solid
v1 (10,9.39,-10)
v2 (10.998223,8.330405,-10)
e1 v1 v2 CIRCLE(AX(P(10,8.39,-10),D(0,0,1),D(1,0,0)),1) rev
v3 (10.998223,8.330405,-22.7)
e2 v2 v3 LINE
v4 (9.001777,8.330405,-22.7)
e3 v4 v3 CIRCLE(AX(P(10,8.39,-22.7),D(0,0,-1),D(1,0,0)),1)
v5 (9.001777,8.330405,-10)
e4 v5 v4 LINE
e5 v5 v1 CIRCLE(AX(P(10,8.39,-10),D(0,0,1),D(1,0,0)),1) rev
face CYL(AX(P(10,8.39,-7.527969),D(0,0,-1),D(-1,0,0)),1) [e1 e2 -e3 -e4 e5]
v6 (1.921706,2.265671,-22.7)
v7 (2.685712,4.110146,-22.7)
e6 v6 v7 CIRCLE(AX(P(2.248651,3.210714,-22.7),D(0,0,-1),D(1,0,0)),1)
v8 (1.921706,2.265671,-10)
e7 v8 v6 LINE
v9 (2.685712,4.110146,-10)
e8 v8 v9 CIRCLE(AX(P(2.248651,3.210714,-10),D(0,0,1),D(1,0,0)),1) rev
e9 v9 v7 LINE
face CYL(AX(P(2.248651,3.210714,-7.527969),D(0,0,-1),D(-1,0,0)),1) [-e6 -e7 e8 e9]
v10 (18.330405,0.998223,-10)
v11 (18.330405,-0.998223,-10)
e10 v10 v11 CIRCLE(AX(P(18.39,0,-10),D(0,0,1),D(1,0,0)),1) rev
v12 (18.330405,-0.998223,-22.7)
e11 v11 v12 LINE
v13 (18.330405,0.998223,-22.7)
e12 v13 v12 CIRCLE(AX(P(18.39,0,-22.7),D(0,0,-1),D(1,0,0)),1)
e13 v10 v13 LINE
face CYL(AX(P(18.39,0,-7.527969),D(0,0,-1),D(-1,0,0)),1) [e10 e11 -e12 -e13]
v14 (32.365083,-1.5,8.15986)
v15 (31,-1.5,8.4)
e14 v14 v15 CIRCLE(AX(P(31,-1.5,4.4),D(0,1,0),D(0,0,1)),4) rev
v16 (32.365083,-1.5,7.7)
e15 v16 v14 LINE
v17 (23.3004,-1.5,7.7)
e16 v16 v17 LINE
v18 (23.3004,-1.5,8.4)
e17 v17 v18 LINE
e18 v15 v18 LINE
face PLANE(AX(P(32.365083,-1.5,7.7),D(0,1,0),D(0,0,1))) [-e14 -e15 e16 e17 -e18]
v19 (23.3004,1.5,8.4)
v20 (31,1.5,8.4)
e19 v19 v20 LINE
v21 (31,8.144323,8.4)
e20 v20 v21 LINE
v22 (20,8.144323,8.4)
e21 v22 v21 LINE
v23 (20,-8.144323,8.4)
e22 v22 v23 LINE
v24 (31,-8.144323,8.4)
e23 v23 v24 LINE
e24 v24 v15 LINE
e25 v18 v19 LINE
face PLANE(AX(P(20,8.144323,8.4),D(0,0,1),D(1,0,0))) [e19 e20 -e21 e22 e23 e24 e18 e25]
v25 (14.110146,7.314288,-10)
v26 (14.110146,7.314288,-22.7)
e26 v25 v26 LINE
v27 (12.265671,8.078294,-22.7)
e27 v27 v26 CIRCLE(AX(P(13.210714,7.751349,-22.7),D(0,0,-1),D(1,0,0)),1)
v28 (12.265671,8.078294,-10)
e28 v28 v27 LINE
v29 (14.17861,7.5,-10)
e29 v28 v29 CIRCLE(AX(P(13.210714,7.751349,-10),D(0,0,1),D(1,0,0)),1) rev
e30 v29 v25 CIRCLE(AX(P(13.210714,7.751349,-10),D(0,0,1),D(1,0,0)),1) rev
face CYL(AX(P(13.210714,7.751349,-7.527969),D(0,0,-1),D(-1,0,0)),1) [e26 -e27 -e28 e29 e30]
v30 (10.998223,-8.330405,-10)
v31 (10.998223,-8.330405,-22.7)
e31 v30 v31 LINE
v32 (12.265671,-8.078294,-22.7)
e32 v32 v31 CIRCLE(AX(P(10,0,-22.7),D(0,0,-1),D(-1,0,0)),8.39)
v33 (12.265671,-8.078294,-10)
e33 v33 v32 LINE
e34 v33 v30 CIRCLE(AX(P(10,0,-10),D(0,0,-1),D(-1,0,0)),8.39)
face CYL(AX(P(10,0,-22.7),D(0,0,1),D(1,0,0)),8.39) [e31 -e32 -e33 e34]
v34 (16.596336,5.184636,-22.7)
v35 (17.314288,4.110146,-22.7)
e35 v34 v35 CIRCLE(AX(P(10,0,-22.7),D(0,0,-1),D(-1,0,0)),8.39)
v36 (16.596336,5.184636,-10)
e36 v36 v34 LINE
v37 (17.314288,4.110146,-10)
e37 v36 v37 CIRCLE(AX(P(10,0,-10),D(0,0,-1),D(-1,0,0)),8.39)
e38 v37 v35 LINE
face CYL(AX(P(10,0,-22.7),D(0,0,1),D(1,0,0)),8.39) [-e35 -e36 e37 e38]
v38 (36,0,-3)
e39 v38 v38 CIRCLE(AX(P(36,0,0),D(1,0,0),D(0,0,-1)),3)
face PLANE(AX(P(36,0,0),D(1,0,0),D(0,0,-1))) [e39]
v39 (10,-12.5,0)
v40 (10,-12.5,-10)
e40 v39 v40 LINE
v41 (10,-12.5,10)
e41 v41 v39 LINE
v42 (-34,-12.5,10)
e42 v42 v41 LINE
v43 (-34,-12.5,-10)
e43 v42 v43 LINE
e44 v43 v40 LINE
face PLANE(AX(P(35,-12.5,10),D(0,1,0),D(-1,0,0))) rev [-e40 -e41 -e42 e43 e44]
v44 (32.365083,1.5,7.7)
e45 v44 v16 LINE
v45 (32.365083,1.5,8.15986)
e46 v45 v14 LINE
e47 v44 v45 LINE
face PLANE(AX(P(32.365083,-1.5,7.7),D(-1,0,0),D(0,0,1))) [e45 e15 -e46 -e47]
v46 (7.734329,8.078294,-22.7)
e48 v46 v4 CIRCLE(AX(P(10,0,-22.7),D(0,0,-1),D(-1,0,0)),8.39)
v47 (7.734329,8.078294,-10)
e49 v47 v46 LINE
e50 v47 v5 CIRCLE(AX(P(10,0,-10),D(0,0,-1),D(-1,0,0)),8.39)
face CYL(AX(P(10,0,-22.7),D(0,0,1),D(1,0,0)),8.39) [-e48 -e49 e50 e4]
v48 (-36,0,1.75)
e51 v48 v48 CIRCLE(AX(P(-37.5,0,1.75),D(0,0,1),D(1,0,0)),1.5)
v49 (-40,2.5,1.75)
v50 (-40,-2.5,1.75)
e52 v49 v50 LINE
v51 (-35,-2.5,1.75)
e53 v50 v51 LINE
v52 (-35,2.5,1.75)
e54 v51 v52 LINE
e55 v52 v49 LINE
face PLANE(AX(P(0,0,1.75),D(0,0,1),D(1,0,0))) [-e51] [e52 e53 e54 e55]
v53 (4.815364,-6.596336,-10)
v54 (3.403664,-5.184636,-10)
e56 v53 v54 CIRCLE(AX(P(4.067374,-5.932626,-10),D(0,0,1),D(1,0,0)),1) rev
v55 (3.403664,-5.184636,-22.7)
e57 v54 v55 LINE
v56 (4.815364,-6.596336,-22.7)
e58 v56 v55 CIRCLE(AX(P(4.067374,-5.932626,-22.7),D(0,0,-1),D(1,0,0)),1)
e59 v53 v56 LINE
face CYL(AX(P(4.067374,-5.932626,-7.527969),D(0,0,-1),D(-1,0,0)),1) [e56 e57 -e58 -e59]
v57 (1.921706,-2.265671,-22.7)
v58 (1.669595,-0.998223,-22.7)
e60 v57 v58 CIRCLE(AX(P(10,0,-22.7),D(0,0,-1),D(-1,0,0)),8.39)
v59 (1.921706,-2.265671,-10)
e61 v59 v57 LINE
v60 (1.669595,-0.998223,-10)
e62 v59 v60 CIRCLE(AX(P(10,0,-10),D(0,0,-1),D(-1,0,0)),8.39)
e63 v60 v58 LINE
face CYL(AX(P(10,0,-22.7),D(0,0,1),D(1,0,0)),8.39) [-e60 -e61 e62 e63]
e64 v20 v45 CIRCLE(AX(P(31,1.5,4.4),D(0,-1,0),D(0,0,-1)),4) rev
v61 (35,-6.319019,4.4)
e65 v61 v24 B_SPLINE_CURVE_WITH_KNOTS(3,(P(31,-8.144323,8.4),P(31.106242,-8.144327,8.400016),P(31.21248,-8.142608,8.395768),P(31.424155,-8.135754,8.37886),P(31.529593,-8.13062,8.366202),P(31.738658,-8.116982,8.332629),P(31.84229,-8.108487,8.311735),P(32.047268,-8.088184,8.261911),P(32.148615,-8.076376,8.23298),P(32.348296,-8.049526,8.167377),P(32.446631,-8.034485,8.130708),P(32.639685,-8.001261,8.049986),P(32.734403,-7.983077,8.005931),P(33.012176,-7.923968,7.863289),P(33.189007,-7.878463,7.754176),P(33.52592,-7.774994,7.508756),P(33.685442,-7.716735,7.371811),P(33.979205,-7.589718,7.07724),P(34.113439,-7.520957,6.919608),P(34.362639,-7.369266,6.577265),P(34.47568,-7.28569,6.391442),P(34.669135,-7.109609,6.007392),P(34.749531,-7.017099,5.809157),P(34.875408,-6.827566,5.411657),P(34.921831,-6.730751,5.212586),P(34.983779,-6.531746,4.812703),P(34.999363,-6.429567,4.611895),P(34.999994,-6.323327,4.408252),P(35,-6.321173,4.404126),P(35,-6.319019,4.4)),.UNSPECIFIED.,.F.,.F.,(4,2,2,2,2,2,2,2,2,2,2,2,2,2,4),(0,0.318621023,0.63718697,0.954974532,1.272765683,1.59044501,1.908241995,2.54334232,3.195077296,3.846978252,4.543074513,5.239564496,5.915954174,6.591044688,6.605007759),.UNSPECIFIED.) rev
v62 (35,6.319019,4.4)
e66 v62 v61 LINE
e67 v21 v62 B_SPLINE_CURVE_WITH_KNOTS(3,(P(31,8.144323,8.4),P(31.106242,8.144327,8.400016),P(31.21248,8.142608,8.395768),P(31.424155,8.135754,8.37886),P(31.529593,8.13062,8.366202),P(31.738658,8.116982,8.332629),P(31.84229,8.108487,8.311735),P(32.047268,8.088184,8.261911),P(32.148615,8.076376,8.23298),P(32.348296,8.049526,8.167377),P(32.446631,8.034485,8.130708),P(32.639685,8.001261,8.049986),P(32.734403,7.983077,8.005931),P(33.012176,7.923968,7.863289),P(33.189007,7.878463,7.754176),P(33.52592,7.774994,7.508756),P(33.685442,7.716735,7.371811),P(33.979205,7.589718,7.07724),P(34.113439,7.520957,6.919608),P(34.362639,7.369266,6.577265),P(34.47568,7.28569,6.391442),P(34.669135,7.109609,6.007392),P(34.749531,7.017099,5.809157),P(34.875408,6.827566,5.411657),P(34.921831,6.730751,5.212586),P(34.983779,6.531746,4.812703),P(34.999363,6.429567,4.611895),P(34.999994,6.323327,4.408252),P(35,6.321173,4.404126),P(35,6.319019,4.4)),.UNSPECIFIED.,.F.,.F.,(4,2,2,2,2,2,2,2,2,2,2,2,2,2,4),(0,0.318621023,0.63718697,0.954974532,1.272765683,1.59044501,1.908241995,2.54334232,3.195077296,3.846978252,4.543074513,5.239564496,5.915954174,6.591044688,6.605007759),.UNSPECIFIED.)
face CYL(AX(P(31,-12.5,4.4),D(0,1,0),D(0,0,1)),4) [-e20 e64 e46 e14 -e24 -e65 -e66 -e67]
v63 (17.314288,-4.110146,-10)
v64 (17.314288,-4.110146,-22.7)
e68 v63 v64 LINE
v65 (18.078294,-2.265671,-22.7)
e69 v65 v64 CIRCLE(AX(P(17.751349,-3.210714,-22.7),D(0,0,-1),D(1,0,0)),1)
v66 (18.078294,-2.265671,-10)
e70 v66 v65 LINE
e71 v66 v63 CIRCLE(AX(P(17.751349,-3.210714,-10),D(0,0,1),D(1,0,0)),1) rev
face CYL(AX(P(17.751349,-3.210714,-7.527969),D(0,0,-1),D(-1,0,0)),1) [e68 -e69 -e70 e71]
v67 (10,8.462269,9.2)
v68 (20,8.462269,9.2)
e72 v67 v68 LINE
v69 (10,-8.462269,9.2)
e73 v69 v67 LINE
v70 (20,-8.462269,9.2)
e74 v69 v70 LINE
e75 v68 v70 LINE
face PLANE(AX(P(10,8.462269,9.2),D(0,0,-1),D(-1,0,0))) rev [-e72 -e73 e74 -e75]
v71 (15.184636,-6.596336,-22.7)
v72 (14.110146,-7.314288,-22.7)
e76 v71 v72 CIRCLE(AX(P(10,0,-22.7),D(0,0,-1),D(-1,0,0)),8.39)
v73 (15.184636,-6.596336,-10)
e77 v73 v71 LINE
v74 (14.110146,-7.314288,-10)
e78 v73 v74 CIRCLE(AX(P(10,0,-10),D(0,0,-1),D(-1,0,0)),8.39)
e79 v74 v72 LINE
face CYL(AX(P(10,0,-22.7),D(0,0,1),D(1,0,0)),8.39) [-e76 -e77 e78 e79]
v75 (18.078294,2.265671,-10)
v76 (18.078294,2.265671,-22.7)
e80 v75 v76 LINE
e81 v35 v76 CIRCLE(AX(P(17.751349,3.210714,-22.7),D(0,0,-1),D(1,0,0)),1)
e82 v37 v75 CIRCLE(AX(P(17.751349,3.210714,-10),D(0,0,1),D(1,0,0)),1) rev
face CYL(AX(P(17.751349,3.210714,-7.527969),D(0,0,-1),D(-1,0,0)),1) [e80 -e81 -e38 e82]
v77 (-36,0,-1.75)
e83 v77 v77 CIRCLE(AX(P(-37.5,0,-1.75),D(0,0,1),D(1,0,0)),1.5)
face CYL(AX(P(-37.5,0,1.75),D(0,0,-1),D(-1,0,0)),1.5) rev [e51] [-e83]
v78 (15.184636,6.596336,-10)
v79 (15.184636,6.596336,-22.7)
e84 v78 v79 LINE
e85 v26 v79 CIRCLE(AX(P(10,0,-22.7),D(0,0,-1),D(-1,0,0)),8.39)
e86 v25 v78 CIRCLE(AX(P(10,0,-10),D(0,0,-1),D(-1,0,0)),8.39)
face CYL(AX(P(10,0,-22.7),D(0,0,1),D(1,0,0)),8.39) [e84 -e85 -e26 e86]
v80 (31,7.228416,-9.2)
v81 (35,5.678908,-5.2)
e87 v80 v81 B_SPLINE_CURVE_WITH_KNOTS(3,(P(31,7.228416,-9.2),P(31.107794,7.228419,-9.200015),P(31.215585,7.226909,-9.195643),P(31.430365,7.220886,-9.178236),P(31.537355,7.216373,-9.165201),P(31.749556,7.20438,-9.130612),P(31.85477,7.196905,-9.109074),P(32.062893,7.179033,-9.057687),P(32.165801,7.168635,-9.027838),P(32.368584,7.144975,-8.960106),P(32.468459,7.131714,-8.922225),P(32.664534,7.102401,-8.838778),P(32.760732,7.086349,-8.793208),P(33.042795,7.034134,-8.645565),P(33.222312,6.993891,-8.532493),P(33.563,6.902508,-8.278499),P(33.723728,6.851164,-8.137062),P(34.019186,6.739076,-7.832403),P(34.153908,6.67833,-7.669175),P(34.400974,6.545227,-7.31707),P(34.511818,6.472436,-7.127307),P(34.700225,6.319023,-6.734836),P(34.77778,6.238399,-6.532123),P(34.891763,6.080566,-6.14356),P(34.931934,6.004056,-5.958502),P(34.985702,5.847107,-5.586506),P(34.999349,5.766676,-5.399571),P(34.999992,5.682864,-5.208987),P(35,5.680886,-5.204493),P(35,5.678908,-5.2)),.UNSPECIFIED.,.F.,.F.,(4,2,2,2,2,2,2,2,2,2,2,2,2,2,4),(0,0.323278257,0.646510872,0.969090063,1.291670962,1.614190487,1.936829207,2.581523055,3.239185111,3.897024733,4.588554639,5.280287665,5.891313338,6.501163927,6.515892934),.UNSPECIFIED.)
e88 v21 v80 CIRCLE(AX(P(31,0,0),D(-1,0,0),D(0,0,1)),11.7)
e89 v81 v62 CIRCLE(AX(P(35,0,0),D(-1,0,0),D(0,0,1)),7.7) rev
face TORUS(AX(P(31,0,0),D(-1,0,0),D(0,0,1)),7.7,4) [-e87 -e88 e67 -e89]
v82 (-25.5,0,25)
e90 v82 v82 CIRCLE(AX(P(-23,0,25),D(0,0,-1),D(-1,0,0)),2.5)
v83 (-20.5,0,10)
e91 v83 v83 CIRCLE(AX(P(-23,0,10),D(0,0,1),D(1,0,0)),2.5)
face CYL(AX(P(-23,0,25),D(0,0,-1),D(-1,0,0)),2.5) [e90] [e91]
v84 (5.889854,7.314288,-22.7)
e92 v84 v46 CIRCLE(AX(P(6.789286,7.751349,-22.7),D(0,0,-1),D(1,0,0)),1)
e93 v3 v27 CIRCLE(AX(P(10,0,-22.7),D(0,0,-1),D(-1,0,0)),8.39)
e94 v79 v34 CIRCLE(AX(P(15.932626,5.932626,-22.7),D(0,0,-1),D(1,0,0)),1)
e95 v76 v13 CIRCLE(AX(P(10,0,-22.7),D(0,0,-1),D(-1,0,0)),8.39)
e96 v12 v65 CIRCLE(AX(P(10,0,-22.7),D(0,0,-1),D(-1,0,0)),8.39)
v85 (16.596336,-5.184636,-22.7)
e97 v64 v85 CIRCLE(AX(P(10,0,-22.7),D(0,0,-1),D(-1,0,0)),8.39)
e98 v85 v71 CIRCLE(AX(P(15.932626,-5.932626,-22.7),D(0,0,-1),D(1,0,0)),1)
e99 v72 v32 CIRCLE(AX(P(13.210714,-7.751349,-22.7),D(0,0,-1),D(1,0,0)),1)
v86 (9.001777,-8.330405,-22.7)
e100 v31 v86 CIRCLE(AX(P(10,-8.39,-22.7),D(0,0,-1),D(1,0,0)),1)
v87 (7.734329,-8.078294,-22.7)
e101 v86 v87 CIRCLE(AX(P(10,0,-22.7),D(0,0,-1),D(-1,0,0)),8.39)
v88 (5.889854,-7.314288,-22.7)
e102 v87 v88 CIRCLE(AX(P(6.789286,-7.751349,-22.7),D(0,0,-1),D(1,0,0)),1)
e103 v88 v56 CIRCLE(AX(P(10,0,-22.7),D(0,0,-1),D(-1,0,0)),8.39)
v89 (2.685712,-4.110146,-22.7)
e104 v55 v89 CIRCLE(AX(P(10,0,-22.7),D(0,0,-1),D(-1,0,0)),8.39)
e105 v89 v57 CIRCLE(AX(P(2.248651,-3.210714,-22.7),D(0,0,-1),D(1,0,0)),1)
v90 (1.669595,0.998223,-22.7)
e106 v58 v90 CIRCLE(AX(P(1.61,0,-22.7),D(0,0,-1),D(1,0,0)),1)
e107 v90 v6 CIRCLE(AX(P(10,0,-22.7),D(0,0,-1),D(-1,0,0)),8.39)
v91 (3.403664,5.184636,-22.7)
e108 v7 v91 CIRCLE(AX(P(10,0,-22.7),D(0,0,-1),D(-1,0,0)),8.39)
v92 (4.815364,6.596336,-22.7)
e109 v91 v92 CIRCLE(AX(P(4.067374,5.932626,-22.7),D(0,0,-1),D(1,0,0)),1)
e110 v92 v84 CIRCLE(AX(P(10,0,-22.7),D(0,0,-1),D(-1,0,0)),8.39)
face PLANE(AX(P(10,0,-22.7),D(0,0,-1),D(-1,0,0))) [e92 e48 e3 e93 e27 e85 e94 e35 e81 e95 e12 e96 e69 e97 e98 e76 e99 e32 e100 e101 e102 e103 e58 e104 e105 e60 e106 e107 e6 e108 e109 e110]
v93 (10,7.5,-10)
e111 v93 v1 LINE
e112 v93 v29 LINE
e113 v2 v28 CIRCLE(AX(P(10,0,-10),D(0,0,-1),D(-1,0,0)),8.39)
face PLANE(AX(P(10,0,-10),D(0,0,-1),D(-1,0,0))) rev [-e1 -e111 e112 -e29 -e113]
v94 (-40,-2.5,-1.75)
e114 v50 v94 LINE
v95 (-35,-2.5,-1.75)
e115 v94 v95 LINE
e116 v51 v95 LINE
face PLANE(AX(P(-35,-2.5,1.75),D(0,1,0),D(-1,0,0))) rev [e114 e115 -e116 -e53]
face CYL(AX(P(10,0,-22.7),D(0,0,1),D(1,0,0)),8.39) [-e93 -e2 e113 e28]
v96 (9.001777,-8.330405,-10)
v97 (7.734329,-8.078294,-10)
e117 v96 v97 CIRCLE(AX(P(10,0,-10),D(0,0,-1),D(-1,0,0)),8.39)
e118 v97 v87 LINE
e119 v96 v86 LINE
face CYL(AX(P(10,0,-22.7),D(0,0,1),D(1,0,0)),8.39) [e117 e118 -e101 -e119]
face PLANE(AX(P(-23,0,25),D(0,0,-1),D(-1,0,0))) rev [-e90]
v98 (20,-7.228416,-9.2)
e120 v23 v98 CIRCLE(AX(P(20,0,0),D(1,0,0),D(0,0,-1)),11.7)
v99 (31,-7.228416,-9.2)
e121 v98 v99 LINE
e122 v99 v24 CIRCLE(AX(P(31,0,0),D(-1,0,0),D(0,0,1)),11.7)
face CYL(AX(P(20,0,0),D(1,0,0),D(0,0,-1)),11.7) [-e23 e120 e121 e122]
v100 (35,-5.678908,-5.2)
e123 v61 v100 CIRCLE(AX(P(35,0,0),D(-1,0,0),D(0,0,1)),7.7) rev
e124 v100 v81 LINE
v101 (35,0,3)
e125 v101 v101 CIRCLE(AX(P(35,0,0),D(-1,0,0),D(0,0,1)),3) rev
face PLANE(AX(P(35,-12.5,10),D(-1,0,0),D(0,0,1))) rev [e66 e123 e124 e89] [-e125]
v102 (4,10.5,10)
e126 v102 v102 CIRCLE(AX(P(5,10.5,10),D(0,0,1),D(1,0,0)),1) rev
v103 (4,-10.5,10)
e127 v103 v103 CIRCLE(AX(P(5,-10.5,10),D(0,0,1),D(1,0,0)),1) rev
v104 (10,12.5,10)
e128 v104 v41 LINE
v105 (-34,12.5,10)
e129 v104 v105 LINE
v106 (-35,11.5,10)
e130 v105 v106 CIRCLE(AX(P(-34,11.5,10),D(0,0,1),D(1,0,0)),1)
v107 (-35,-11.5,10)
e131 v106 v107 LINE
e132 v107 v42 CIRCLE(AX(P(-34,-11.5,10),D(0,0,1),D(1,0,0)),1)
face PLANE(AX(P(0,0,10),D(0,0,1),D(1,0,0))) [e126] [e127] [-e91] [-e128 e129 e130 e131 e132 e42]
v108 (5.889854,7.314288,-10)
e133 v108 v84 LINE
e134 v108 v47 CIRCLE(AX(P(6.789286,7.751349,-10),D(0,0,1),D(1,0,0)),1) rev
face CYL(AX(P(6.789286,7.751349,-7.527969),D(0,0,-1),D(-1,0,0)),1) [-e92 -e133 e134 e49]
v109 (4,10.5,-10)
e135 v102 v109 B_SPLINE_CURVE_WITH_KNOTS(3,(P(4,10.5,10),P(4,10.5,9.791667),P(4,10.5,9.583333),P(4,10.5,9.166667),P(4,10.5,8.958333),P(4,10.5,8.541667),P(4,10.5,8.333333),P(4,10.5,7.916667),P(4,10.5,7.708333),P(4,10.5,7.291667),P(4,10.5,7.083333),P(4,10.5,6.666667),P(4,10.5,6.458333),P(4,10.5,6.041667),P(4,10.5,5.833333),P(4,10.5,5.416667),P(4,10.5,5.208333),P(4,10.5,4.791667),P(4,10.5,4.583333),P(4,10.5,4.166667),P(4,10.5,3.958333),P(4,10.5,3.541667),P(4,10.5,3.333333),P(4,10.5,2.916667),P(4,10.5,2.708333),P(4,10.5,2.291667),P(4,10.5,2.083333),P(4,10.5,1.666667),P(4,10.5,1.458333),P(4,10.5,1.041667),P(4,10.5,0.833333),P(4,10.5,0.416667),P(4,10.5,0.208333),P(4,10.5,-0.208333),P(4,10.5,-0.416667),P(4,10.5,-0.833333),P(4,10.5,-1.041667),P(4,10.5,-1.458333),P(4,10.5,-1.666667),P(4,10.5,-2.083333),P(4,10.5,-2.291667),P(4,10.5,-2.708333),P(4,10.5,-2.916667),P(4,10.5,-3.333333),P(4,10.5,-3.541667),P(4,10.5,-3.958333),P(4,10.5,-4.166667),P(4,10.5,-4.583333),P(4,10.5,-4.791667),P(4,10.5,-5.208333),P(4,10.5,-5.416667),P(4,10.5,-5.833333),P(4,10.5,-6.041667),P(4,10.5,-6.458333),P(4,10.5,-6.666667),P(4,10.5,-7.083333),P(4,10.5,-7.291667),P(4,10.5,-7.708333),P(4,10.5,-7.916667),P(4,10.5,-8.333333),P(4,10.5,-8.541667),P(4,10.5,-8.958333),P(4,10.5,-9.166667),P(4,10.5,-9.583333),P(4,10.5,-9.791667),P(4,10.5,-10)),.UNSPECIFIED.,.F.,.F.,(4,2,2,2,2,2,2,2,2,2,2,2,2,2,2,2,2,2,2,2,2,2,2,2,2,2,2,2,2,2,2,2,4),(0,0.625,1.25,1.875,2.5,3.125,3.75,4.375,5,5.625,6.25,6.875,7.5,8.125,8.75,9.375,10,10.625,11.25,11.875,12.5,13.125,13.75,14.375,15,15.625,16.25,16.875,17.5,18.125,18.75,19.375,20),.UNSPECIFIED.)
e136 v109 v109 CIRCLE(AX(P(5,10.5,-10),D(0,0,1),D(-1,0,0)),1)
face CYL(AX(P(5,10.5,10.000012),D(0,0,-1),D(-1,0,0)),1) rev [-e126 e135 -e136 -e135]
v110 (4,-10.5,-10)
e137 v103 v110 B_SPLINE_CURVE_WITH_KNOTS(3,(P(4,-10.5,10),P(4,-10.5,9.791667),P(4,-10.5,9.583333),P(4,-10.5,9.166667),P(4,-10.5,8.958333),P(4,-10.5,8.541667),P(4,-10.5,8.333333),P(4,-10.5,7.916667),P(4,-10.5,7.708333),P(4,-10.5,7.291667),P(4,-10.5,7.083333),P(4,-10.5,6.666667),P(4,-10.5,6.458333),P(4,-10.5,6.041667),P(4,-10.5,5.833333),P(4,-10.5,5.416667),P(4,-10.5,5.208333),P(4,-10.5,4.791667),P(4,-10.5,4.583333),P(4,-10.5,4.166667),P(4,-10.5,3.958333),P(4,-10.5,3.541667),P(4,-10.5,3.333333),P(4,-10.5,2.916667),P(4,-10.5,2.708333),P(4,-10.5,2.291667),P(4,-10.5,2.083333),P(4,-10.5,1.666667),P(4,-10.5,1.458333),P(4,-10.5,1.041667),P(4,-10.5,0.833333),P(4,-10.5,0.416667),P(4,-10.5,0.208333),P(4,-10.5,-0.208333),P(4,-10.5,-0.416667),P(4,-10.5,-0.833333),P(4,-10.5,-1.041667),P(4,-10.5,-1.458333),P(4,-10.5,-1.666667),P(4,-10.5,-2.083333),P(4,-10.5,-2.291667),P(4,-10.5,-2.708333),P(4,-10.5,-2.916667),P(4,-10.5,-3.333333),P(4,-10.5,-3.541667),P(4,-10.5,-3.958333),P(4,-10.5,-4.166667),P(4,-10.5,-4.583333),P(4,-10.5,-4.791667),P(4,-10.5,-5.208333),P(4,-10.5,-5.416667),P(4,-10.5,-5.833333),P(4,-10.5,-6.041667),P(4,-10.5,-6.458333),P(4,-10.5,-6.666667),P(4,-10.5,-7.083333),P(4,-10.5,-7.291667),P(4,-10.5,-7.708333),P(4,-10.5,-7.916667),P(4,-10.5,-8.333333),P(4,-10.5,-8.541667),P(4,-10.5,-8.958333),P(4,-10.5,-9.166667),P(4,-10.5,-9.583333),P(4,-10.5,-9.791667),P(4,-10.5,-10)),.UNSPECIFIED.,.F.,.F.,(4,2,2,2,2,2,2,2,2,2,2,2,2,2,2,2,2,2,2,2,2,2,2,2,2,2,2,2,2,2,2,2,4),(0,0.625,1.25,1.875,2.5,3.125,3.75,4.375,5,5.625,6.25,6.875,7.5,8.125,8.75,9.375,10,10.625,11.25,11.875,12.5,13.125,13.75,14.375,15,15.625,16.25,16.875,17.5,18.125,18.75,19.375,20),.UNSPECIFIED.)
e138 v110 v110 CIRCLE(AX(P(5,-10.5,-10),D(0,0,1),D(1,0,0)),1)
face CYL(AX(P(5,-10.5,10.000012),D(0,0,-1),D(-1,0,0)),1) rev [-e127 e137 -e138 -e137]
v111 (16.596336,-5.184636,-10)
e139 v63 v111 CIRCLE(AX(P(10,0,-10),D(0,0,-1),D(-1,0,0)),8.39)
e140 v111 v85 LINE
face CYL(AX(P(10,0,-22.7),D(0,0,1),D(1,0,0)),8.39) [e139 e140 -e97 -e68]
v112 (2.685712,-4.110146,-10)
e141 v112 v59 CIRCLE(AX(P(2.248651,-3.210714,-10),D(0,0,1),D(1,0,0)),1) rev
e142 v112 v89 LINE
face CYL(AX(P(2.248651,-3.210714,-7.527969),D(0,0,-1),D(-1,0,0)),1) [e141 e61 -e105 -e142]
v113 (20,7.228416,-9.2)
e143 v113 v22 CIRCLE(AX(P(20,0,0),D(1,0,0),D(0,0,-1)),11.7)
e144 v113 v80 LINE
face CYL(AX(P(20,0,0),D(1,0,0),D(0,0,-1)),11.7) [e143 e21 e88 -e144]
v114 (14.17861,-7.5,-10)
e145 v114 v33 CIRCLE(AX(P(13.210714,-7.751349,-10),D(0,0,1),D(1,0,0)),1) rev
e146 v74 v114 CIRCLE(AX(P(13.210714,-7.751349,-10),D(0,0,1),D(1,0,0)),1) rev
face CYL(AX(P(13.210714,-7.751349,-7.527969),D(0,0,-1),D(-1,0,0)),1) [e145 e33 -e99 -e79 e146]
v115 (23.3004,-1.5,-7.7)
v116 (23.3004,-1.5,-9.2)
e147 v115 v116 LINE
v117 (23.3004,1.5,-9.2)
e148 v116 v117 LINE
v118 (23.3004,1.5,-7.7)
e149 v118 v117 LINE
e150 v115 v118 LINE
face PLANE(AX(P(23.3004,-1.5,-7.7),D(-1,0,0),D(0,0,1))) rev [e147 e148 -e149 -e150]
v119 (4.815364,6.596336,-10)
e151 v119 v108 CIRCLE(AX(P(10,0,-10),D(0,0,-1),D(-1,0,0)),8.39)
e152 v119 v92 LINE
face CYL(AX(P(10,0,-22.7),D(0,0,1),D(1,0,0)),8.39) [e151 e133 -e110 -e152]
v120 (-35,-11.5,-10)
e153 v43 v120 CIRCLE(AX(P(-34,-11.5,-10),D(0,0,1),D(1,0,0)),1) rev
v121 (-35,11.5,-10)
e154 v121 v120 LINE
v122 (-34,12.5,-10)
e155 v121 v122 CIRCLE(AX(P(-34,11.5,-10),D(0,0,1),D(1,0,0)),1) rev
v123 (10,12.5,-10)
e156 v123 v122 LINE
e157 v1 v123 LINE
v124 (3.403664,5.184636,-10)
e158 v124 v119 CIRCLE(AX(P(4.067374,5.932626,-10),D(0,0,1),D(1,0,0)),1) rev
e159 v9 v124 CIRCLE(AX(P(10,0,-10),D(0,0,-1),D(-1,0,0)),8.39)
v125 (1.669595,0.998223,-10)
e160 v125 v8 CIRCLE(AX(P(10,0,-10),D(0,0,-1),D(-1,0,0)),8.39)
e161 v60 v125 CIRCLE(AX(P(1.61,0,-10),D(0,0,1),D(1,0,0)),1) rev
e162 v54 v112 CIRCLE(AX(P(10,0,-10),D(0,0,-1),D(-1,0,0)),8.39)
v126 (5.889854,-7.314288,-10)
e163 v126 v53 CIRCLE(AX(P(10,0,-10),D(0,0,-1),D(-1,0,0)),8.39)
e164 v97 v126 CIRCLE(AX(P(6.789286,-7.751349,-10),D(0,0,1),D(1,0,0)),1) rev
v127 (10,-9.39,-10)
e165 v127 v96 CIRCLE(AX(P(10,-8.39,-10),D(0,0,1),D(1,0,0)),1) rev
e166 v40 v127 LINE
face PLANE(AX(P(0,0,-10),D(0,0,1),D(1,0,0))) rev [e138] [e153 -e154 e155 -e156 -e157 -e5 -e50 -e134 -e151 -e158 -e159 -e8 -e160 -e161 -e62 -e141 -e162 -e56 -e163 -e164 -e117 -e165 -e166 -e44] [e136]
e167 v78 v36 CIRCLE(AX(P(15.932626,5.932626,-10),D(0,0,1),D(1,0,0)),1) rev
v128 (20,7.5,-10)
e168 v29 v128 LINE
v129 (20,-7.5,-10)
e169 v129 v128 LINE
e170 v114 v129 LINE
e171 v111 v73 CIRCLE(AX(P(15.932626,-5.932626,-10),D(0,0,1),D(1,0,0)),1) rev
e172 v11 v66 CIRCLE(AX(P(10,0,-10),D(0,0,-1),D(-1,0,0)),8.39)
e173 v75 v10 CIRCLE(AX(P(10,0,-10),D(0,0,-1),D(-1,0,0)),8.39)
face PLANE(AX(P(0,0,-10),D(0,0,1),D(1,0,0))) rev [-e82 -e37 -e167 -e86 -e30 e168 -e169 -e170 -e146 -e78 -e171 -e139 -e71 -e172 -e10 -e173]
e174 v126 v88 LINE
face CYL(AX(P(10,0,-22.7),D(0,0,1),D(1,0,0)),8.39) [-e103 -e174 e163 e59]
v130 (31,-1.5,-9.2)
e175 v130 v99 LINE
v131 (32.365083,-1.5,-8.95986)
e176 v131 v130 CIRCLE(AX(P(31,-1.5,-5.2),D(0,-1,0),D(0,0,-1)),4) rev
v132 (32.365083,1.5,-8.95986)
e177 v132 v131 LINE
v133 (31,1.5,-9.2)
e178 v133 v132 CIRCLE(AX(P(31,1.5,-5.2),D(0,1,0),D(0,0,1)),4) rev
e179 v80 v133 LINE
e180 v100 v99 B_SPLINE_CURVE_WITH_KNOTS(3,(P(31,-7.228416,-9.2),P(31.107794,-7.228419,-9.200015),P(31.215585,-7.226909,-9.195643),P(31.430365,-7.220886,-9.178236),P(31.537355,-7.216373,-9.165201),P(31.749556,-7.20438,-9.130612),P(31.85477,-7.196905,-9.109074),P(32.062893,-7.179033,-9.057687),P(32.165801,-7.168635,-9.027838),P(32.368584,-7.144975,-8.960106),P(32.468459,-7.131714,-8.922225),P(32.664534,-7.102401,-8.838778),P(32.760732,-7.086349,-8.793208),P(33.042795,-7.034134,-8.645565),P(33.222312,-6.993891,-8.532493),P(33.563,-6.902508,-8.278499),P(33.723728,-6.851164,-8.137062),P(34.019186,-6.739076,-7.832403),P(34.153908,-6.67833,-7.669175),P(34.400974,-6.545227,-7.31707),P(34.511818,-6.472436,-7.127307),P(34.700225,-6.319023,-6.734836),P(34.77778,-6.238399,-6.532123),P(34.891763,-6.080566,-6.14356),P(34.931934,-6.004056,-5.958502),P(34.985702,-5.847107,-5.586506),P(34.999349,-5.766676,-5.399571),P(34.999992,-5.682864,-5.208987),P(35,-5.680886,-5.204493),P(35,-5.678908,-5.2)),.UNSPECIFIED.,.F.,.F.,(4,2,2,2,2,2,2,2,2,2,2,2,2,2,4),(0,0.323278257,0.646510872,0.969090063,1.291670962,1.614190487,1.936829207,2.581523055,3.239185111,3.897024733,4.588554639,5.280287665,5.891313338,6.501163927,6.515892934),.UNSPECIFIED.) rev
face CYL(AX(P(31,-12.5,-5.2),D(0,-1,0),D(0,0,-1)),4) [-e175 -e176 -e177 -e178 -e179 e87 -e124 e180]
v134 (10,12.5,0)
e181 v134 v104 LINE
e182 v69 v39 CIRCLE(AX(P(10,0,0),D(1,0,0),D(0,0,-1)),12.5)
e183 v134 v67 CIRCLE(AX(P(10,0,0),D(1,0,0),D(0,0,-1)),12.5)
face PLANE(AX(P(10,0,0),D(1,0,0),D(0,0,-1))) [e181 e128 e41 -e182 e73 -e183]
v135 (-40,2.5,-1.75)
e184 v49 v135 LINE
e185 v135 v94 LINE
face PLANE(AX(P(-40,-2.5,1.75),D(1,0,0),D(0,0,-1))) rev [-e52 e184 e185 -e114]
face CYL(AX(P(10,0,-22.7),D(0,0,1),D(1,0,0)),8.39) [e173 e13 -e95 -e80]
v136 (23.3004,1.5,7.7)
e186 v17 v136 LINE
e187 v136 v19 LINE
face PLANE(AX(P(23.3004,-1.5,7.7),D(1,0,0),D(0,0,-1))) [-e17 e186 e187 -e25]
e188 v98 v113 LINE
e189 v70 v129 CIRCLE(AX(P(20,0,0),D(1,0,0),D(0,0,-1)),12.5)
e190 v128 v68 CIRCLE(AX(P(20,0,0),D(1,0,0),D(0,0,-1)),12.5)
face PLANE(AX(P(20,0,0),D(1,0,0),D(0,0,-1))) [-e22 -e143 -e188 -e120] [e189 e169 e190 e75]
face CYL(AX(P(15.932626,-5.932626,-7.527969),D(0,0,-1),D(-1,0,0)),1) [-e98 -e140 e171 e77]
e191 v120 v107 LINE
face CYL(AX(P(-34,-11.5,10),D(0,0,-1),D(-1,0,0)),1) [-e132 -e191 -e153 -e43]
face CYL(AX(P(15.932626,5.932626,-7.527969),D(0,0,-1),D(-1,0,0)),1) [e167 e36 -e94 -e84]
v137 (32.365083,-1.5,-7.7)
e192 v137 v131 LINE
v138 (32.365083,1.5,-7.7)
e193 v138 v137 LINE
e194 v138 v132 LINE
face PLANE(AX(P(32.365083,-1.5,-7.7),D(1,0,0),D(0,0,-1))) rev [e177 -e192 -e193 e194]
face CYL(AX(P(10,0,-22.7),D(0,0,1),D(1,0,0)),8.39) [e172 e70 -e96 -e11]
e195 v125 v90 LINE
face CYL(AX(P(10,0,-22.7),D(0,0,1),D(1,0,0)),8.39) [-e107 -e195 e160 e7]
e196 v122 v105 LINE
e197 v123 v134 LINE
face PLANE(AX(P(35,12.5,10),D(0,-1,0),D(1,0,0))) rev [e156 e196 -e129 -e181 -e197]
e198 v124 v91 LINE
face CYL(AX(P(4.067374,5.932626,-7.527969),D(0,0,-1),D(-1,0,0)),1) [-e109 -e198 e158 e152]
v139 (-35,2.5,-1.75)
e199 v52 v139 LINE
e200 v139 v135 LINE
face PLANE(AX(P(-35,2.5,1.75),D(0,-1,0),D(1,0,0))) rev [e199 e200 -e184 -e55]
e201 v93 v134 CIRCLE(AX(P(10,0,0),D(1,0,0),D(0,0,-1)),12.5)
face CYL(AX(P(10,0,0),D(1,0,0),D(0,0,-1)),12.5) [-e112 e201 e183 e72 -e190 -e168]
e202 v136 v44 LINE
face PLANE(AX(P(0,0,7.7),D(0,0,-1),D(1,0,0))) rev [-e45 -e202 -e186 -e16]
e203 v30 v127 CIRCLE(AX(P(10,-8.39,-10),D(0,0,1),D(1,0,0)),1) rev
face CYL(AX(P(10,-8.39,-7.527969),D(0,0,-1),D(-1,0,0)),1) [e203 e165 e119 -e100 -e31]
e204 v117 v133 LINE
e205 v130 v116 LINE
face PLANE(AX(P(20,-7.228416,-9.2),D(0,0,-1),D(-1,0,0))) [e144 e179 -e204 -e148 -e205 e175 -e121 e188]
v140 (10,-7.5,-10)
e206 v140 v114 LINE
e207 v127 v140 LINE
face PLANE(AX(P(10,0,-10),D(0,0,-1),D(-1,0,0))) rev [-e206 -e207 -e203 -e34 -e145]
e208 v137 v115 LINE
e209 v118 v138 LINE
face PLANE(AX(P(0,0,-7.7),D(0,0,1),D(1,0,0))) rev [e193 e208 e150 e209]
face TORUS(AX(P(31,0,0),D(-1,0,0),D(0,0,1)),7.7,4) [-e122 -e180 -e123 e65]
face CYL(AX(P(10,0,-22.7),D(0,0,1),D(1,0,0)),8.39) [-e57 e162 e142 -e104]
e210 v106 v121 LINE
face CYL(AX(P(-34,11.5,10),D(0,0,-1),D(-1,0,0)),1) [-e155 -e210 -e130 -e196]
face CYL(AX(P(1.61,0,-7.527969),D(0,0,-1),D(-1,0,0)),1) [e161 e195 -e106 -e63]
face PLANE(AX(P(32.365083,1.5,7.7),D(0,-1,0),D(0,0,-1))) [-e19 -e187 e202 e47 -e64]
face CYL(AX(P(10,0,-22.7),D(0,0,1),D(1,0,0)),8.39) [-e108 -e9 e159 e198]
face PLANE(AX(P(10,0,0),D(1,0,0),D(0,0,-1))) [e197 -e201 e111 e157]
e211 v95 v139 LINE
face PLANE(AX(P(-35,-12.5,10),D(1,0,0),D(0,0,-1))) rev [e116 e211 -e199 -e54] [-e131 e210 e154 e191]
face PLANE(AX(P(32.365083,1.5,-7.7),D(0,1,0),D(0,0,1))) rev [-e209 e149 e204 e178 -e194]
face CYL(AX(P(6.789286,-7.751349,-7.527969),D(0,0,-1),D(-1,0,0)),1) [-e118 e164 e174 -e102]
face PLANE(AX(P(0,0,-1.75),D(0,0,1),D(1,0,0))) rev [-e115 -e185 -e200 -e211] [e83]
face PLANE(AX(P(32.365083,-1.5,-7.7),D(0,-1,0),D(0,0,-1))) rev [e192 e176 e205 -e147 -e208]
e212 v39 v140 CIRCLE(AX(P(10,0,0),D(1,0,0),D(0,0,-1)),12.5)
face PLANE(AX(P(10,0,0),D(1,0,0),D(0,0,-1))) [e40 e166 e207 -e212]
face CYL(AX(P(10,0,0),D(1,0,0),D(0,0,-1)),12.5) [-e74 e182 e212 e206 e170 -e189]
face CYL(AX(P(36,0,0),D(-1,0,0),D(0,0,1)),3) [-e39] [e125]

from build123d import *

# Parameters (mm, degrees)
BOSS_EXTRUDE1_DEPTH     = 10
CUT_EXTRUDE2_DEPTH      = 25
SKETCH4_W               = 2.420711262391846
SKETCH4_H               = 16.924538398432034
CUT_EXTRUDE3_DEPTH      = 25
CUT_EXTRUDE4_DEPTH      = 15.000000000000002
FILLET1_R               = 4
SKETCH6_R               = 3
BOSS_EXTRUDE2_DEPTH     = 1
SKETCH7_W               = 9.06468295299787
SKETCH7_H               = 3
CUT_EXTRUDE5_DEPTH      = 1.5
FILLET2_R               = 1
SKETCH8_R               = 1.500000000000004
BOSS_EXTRUDE3_DEPTH     = 1.75
CUT_EXTRUDE7_DEPTH      = 47.435439052516784
CUT_EXTRUDE7_DEPTH_BACK = 47.435439052516784
SKETCH9_R               = 1
SKETCH10_R              = 2.4999999999999982
CUT_EXTRUDE8_DEPTH      = 47.435439052516784
SKETCH11_R              = 8.39
BOSS_EXTRUDE5_DEPTH     = 12.7
BOSS_EXTRUDE6_START     = -12.7
BOSS_EXTRUDE6_DEPTH     = 12.7
SKETCH14_R              = 2.4999999999999982
BOSS_EXTRUDE7_DEPTH     = 35


with BuildPart() as part:
    # Sketch1 → Boss-Extrude1 (new, symmetric)
    with BuildSketch(Plane.XY):
        Polygon((34.99999999999999, -12.5), (-35.00000000000001, -12.500000000000005), (-35.00000000000001, 12.499999999999995), (34.99999999999999, 12.500000000000002), align=None)
    extrude(amount=BOSS_EXTRUDE1_DEPTH, both=True)

    # Sketch2 → Cut-Extrude2 (cut)
    with BuildSketch(Plane(origin=(34.99999999999999, 0, 0), x_dir=(0, 0, -1), z_dir=(1, 0, 0))):
        with BuildLine():
            Line((-10, 12.500000000000002), (-10, 7.500000000000002))
            ThreePointArc((-9.999999999999998, 7.500000000000003), (-5.590169943749482, 11.180339887498945), (-1.821e-14, 12.500000000000004))
            Line((-1.776e-14, 12.500000000000002), (-10, 12.500000000000002))
        make_face()
        with BuildLine():
            Line((10, 12.500000000000002), (-1.776e-14, 12.500000000000002))
            ThreePointArc((-1.821e-14, 12.500000000000004), (5.590169943749467, 11.180339887498956), (10, 7.500000000000001))
            Line((10, 7.500000000000002), (10, 12.500000000000002))
        make_face()
        with BuildLine():
            ThreePointArc((9.999999999999998, -7.500000000000003), (5.590169943749469, -11.180339887498953), (-1.554e-14, -12.5))
            Line((-1.599e-14, -12.5), (10, -12.5))
            Line((10, -12.5), (10, -7.500000000000002))
        make_face()
        with BuildLine():
            ThreePointArc((-1.554e-14, -12.5), (-5.590169943749482, -11.180339887498945), (-10, -7.500000000000001))
            Line((-10, -7.500000000000002), (-10, -12.5))
            Line((-10, -12.5), (-1.599e-14, -12.5))
        make_face()
    extrude(amount=-CUT_EXTRUDE2_DEPTH, mode=Mode.SUBTRACT)

    # Sketch4 → Cut-Extrude3 (cut)
    with BuildSketch(Plane(origin=(34.99999999999999, 0, 0), x_dir=(0, 0, -1), z_dir=(1, 0, 0))):
        with Locations((-10.41035563119592, 0)):
            Rectangle(SKETCH4_W, SKETCH4_H)
    extrude(amount=-CUT_EXTRUDE3_DEPTH, mode=Mode.SUBTRACT)

    # Sketch5 → Cut-Extrude4 (cut)
    with BuildSketch(Plane(origin=(34.99999999999999, 0, 0), x_dir=(0, 0, -1), z_dir=(1, 0, 0))):
        with BuildLine():
            Line((-9.199999999999998, 8.462269199216015), (-9.199999999999996, -8.462269199216017))
            ThreePointArc((-9.199999999999996, -8.462269199216017), (0.6256920192394629, -12.484330558626684), (10, -7.500000000000002))
            Line((10, -7.500000000000002), (10, 7.500000000000002))
            ThreePointArc((10, 7.500000000000002), (0.6256920192394629, 12.484330558626686), (-9.199999999999998, 8.462269199216015))
        make_face()
        with BuildLine():
            Line((-8.399999999999997, 8.144323176298942), (-8.399999999999997, -8.144323176298942))
            ThreePointArc((-8.399999999999997, -8.144323176298942), (0.608047219709459, -11.684189256367068), (9.2, -7.228416147400481))
            Line((9.2, -7.228416147400481), (9.2, 7.228416147400481))
            ThreePointArc((9.2, 7.228416147400481), (0.6080472197094615, 11.684189256367066), (-8.399999999999997, 8.144323176298942))
        make_face(mode=Mode.SUBTRACT)
    extrude(amount=-CUT_EXTRUDE4_DEPTH, mode=Mode.SUBTRACT)

    # Fillet1
    # the kernel refuses this fillet: 4 mm, written as the material it takes off along each edge
    with BuildSketch(Plane(origin=(34.99999999999999, -4.44e-15, 6.7e-16), x_dir=(0, -0.1880210929197643, -0.982164990527181), z_dir=(0, -0.982164990527181, 0.1880210929197643))) as fillet1_piece_1:
        with BuildLine():
            CenterArc((11.700000000000003 - FILLET1_R, -FILLET1_R), FILLET1_R, 0, 89.99999999999999)
            Line((11.700000000000003 - FILLET1_R, 0), (11.700000000000003, 0))
            Line((11.700000000000003, 0), (11.700000000000003, -FILLET1_R))
        make_face()
    revolve(axis=Axis((34.99999999999999, -4.44e-15, 6.7e-16), (1, 0, 0)), revolution_arc=195.71664993769073, mode=Mode.SUBTRACT)
    with BuildSketch(Plane(origin=(34.99999999999999, -17.22841614740048, -9.2), x_dir=(-1, 0, 0), z_dir=(0, 1, 0))) as fillet1_piece_2:
        with BuildLine():
            CenterArc((FILLET1_R, FILLET1_R), FILLET1_R, 180, 90)
            Line((0, FILLET1_R), (0, 0))
            Line((0, 0), (FILLET1_R, 0))
        make_face()
    extrude(amount=34.45683229480096, mode=Mode.SUBTRACT)
    with BuildSketch(Plane(origin=(34.99999999999999, 0, 6.7e-16), x_dir=(0, 0.0850574768635666, 0.9963760462945724), z_dir=(0, 0.9963760462945724, -0.0850574768635666))) as fillet1_piece_3:
        with BuildLine():
            CenterArc((11.700000000000003 - FILLET1_R, -FILLET1_R), FILLET1_R, 0, 90)
            Line((11.700000000000003 - FILLET1_R, 0), (11.700000000000003, 0))
            Line((11.700000000000003, 0), (11.700000000000003, -FILLET1_R))
        make_face()
    revolve(axis=Axis((34.99999999999999, 0, 6.7e-16), (1, 0, 0)), revolution_arc=195.71664993769085, mode=Mode.SUBTRACT)
    with BuildSketch(Plane(origin=(34.99999999999999, 18.14432317629894, 8.399999999999997), x_dir=(-1, 0, 0), z_dir=(0, -1, 0))) as fillet1_piece_4:
        with BuildLine():
            CenterArc((FILLET1_R, FILLET1_R), FILLET1_R, 180, 90)
            Line((0, FILLET1_R), (0, 0))
            Line((0, 0), (FILLET1_R, 0))
        make_face()
    extrude(amount=36.28864635259788, mode=Mode.SUBTRACT)

    # Sketch6 → Boss-Extrude2 (add)
    with BuildSketch(Plane(origin=(34.99999999999999, 0, 0), x_dir=(0, 0, -1), z_dir=(1, 0, 0))):
        with Locations(Location((0, 0, 0), (0, 0, 180))):
            Circle(SKETCH6_R)
    extrude(amount=BOSS_EXTRUDE2_DEPTH)

    # Sketch7 → Cut-Extrude5 (cut)
    with BuildSketch(Plane(origin=(0, 0, -9.2), x_dir=(-1, 0, 0), z_dir=(0, 0, -1))):
        with Locations((-27.832741428017933, 0)):
            Rectangle(SKETCH7_W, SKETCH7_H)
    cut_extrude5 = extrude(amount=-CUT_EXTRUDE5_DEPTH, mode=Mode.SUBTRACT)

    # Mirror1: Cut-Extrude5 across plane
    add(cut_extrude5.mirror(Plane.XY), mode=Mode.SUBTRACT)

    # Fillet2
    fillet2_edges = [part.edges().sort_by_distance(p)[0] for p in [
        (-35.00000000000001, 12.499999999999995, 0),
        (-35.00000000000001, -12.500000000000005, 0),
    ]]
    fillet(fillet2_edges, radius=FILLET2_R)

    # Sketch8 → Boss-Extrude3 (add, symmetric)
    with BuildSketch(Plane.XY):
        Polygon((-35.00000000000001, -2.4999999999999987), (-40.00000000000001, -2.499999999999998), (-40.00000000000001, 2.500000000000002), (-35.00000000000001, 2.4999999999999987), align=None)
        with Locations((-37.50000000000001, 2.17e-15)):
            Circle(SKETCH8_R, mode=Mode.SUBTRACT)
    extrude(amount=BOSS_EXTRUDE3_DEPTH, both=True)

    # Sketch9 → Cut-Extrude7 (cut, two sides: drawn at the far end of the back side and taken through both)
    with BuildSketch(Plane.XY.offset(10).offset(-CUT_EXTRUDE7_DEPTH_BACK)):
        with Locations(Location((4.99999999999999, -10.500000000000004, 0), (0, 0, 180))):
            Circle(SKETCH9_R)
        with Locations(Location((4.99999999999999, 10.500000000000004, 0), (0, 0, 180))):
            Circle(SKETCH9_R)
    extrude(amount=CUT_EXTRUDE7_DEPTH + CUT_EXTRUDE7_DEPTH_BACK, mode=Mode.SUBTRACT)

    # Sketch10 → Cut-Extrude8 (cut, through all)
    with BuildSketch(Plane(origin=(0, 0, -10), x_dir=(-1, 0, 0), z_dir=(0, 0, -1))):
        with Locations((23.00000000000001, 0)):
            Circle(SKETCH10_R)
    extrude(amount=-CUT_EXTRUDE8_DEPTH, mode=Mode.SUBTRACT)

    # Sketch11 → Boss-Extrude5 (add)
    with BuildSketch(Plane(origin=(0, 0, -10), x_dir=(-1, 0, 0), z_dir=(0, 0, -1))):
        with Locations(Location((-9.999999999999998, -1.3e-15, 0), (0, 0, 243.370213058))):
            Circle(SKETCH11_R)
    extrude(amount=BOSS_EXTRUDE5_DEPTH)

    # Sketch13 → Boss-Extrude6 (add)
    with BuildSketch(Plane(origin=(0, 0, -22.7), x_dir=(-1, 0, 0), z_dir=(0, 0, -1)).offset(BOSS_EXTRUDE6_START)):
        with BuildLine():
            ThreePointArc((-9.001777346932231, 8.330405244338497), (-9.999999999999995, 8.389999999999999), (-10.998222653067758, 8.330405244338497))
            ThreePointArc((-10.998222653067758, 8.330405244338497), (-9.999999999999995, 9.389999999999999), (-9.001777346932231, 8.330405244338497))
        make_face()
        with BuildLine():
            ThreePointArc((-5.889854450046044, 7.314287631628538), (-6.7892860024568655, 7.751349277769716), (-7.734329406162691, 8.078294173909544))
            ThreePointArc((-7.734329406162691, 8.078294173909544), (-6.406602570091955, 8.675228810280863), (-5.889854450046044, 7.314287631628538))
        make_face()
        with BuildLine():
            ThreePointArc((-3.4036639545781147, 5.184636031185651), (-4.067374105844959, 5.9326258941552705), (-4.8153639688146, 6.596336045422089))
            ThreePointArc((-4.8153639688146, 6.596336045422089), (-3.360267324658414, 6.639732675341834), (-3.4036639545781147, 5.184636031185651))
        make_face()
        with BuildLine():
            ThreePointArc((-1.9217058260904158, 2.265670593837173), (-2.2486507222303, 3.2107139975430976), (-2.6857123683715303, 4.110145549954018))
            ThreePointArc((-2.6857123683715303, 4.110145549954018), (-1.3247711897190175, 3.593397429908187), (-1.9217058260904158, 2.265670593837173))
        make_face()
        with BuildLine():
            ThreePointArc((-1.6695947556614985, -0.99822265306777), (-1.6099999999999959, -5.96e-15), (-1.669594755661497, 0.9982226530677578))
            ThreePointArc((-1.669594755661497, 0.9982226530677578), (-0.609999999999998, -6.09e-15), (-1.6695947556614985, -0.99822265306777))
        make_face()
        with BuildLine():
            ThreePointArc((-2.6857123683715347, -4.110145549954029), (-2.2486507222303036, -3.21071399754311), (-1.9217058260904158, -2.265670593837187))
            ThreePointArc((-1.9217058260904158, -2.265670593837187), (-1.32477118971902, -3.593397429908198), (-2.6857123683715347, -4.110145549954029))
        make_face()
        with BuildLine():
            ThreePointArc((-4.8153639688145145, -6.596336045421976), (-4.067374105844869, -5.932625894155138), (-3.4036639545780307, -5.1846360311854935))
            ThreePointArc((-3.4036639545780307, -5.1846360311854935), (-3.3602673246583237, -6.639732675341683), (-4.8153639688145145, -6.596336045421976))
        make_face()
        with BuildLine():
            ThreePointArc((-7.734329406162824, -8.078294173909585), (-6.789286002456899, -7.751349277769699), (-5.88985445004598, -7.314287631628469))
            ThreePointArc((-5.88985445004598, -7.314287631628469), (-6.406602570091808, -8.675228810280979), (-7.734329406162824, -8.078294173909585))
        make_face()
        with BuildLine():
            ThreePointArc((-10.998222653067767, -8.330405244338499), (-10.000000000000002, -8.39), (-9.001777346932236, -8.3304052443385))
            ThreePointArc((-9.001777346932236, -8.3304052443385), (-10, -9.39), (-10.998222653067767, -8.330405244338499))
        make_face()
        with BuildLine():
            ThreePointArc((-14.110145549954028, -7.314287631628465), (-13.210713997543106, -7.751349277769697), (-12.26567059383718, -8.078294173909583))
            ThreePointArc((-12.26567059383718, -8.078294173909583), (-13.593397429908197, -8.675228810280984), (-14.110145549954028, -7.314287631628465))
        make_face()
        with BuildLine():
            ThreePointArc((-16.596336045421967, -5.1846360311854855), (-15.932625894155128, -5.932625894155132), (-15.184636031185486, -6.596336045421974))
            ThreePointArc((-15.184636031185486, -6.596336045421974), (-16.63973267534168, -6.63973267534168), (-16.596336045421967, -5.1846360311854855))
        make_face()
        with BuildLine():
            ThreePointArc((-18.07829417390958, -2.26567059383718), (-17.751349277769695, -3.2107139975431056), (-17.314287631628464, -4.110145549954026))
            ThreePointArc((-17.314287631628464, -4.110145549954026), (-18.675228810280974, -3.5933974299081965), (-18.07829417390958, -2.26567059383718))
        make_face()
        with BuildLine():
            ThreePointArc((-18.330405244338493, 0.9982226530677667), (-18.389999999999993, 3.45e-15), (-18.330405244338493, -0.9982226530677624))
            ThreePointArc((-18.330405244338493, -0.9982226530677624), (-19.39, 2e-15), (-18.330405244338493, 0.9982226530677667))
        make_face()
        with BuildLine():
            ThreePointArc((-17.314287631628464, 4.110145549954029), (-17.751349277769695, 3.210713997543108), (-18.07829417390958, 2.265670593837187))
            ThreePointArc((-18.07829417390958, 2.265670593837187), (-18.675228810280977, 3.5933974299081974), (-17.314287631628464, 4.110145549954029))
        make_face()
        with BuildLine():
            ThreePointArc((-15.18463603118538, 6.596336045422069), (-15.932625894155038, 5.932625894155242), (-16.596336045421882, 5.184636031185604))
            ThreePointArc((-16.596336045421882, 5.184636031185604), (-16.63973267534157, 6.639732675341801), (-15.18463603118538, 6.596336045422069))
        make_face()
        with BuildLine():
            ThreePointArc((-12.265670593837033, 8.078294173909628), (-13.210713997542964, 7.75134927776976), (-14.110145549953884, 7.314287631628539))
            ThreePointArc((-14.110145549953884, 7.314287631628539), (-13.593397429908032, 8.675228810281054), (-12.265670593837033, 8.078294173909628))
        make_face()
    extrude(amount=BOSS_EXTRUDE6_DEPTH)

    # Sketch14 → Boss-Extrude7 (add)
    with BuildSketch(Plane(origin=(0, 0, -10), x_dir=(-1, 0, 0), z_dir=(0, 0, -1))):
        with Locations((23.00000000000001, 0)):
            Circle(SKETCH14_R)
    extrude(amount=-BOSS_EXTRUDE7_DEPTH)


solid = part.part
